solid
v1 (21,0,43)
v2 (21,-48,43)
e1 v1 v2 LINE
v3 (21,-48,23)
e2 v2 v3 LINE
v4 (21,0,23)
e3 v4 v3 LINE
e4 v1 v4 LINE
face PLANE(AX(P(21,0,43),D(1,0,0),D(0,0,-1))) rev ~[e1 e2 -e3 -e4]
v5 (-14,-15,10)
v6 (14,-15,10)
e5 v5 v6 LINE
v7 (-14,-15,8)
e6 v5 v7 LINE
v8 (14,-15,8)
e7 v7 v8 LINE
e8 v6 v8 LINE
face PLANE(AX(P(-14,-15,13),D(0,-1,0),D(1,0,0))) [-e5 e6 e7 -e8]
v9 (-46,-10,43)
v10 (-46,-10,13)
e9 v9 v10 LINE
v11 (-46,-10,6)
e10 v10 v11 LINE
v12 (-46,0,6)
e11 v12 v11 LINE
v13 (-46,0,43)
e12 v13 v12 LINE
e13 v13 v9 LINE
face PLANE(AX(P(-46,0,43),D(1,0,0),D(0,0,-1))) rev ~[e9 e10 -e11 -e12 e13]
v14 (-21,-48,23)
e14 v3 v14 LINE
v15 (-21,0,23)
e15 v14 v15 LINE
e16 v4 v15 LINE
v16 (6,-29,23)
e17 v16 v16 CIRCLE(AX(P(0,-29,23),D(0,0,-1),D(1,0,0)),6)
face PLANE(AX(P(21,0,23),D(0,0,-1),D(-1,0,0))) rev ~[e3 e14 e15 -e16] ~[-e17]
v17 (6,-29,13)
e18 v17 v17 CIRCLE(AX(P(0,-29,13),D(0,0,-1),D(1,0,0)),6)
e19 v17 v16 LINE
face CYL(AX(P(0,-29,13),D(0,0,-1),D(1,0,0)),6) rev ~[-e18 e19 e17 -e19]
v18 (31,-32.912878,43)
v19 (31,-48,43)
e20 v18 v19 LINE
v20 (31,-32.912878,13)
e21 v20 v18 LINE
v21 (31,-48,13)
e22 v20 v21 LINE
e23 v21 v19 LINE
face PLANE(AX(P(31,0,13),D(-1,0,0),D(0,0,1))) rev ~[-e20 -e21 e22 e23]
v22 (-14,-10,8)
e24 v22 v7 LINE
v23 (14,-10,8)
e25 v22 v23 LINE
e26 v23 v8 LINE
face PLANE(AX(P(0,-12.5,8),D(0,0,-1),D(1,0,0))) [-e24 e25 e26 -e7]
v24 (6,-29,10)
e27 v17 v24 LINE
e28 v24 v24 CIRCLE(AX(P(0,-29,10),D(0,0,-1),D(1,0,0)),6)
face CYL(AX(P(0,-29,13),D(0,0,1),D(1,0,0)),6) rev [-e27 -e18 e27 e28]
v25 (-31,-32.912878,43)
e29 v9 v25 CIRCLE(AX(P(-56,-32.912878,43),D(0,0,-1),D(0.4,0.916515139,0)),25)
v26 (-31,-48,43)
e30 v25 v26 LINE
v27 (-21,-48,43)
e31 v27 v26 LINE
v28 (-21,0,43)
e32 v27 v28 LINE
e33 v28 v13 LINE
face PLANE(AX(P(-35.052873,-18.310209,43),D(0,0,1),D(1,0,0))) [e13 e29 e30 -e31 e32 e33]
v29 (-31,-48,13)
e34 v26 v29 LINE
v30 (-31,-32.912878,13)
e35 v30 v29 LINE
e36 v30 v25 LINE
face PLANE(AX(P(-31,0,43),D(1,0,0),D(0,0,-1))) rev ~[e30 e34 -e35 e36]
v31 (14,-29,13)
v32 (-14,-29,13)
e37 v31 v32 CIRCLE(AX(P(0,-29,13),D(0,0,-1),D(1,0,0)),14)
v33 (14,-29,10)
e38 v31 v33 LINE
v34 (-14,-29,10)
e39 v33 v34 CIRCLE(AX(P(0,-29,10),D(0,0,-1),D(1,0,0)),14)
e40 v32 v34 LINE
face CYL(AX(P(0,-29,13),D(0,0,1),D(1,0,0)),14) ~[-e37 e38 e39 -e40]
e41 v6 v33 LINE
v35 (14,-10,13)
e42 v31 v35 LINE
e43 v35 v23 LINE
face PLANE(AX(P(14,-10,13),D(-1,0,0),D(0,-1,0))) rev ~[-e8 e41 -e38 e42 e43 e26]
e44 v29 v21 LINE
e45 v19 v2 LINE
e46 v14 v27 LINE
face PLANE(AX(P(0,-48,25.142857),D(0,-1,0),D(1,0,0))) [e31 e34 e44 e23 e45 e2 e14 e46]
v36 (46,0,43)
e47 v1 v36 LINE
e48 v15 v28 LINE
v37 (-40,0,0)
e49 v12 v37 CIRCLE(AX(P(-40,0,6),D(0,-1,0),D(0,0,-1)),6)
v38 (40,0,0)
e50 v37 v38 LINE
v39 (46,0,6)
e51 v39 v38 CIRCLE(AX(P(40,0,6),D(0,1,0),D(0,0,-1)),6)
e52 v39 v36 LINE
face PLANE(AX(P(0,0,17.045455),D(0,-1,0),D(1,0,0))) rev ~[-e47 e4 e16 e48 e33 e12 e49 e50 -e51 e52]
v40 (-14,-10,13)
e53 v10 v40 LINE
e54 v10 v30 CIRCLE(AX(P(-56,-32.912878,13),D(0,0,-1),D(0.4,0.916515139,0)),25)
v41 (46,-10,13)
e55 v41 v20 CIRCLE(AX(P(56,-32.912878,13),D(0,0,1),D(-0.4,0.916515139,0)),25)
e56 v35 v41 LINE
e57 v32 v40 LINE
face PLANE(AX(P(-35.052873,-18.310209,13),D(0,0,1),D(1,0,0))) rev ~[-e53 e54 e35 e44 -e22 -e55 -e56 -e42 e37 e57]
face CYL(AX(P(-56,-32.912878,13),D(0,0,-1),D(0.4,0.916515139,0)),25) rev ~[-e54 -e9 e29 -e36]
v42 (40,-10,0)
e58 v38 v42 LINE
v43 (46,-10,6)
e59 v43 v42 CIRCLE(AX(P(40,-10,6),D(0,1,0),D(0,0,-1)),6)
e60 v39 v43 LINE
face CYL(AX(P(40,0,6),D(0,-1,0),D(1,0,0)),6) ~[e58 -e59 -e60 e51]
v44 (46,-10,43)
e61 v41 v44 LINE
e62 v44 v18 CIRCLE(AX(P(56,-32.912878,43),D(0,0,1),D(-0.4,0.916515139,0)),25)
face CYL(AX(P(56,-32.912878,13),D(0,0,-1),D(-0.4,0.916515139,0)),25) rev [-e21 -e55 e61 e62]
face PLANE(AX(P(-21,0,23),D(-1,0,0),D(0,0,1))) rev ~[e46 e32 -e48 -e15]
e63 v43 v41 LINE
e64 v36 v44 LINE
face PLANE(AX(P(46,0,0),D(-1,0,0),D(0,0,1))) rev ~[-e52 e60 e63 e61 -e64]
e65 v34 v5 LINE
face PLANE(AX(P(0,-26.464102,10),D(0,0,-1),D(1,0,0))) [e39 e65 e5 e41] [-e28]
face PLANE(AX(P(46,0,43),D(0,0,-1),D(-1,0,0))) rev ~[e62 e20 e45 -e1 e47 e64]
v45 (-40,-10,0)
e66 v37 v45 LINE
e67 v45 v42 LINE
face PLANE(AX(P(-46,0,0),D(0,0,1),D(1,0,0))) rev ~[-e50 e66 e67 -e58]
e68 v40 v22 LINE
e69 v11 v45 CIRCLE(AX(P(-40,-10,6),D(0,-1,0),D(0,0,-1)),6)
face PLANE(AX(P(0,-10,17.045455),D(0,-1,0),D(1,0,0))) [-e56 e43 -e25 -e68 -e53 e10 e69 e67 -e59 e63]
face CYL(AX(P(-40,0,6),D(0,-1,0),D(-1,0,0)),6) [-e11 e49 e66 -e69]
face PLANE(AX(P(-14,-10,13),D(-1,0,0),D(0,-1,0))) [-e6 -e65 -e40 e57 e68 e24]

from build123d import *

# Parameters (mm, degrees)
F1_DEPTH    = 48
F2_DEPTH    = 10
F3_R        = 6
F4_T1_DEPTH = 30
F5_R        = 6
F6_DEPTH    = 3
F5_W        = 28
F5_H        = 5
F7_DEPTH    = 5
F8_DEPTH    = 25


# Not quite as in the source:
# - a fillet or chamfer that OpenCascade refuses, or shapes differently, is made with other operations: its cross-section is extruded or revolved along the edge and cut away or added


with BuildPart() as f1:
    # F0 (on Front) → F1 (new body)
    with BuildSketch(Plane.XZ):
        Polygon((-21, 43), (-31, 43), (-31, 13), (31, 13), (31, 43), (21, 43), (21, 23), (-21, 23), align=None)
    extrude(amount=F1_DEPTH)

    # F0 (on Front) → F2 (join)
    with BuildSketch(Plane.XZ):
        Polygon((-31, 43), (-46, 43), (-46, 0), (46, 0), (46, 43), (31, 43), (31, 13), (-31, 13), align=None)
        Polygon((-21, 43), (-31, 43), (-31, 13), (31, 13), (31, 43), (21, 43), (21, 23), (-21, 23), align=None)
    extrude(amount=F2_DEPTH)

    # F3
    f3_edges = [f1.edges().sort_by_distance(p)[0] for p in [
        (-46, -5, 0),
        (46, -5, 0),
    ]]
    fillet(f3_edges, radius=F3_R)

    # F4: fillet of radius 25 on 2 edges, made by hand

    # F4_s2 → F4_t1 (join)
    with BuildSketch(Plane.XY.offset(13)):
        with BuildLine():
            ThreePointArc((-46, -10), (-35.0834993366, -19.2198145372), (-31, -32.9128784748))
            Line((-31, -32.9128784748), (-31, -10))
            Line((-31, -10), (-46, -10))
        make_face()
        with BuildLine():
            ThreePointArc((46, -10), (35.0834993366, -19.2198145372), (31, -32.9128784748))
            Line((31, -32.9128784748), (31, -10))
            Line((31, -10), (46, -10))
        make_face()
    extrude(amount=F4_T1_DEPTH)

    # F5 (on face) → F6 (join)
    with BuildSketch(Plane(origin=(0, 0, 13), x_dir=(1, 0, 0), z_dir=(0, 0, -1))):
        with BuildLine():
            Line((14, 15), (14, 29))
            ThreePointArc((14, 29), (0, 43), (-14, 29))
            Line((-14, 29), (-14, 15))
            Line((-14, 15), (14, 15))
        make_face()
        with Locations((0, 29)):
            Circle(F5_R, mode=Mode.SUBTRACT)
    extrude(amount=F6_DEPTH)

    # F5 (on face) → F7 (join)
    with BuildSketch(Plane(origin=(0, 0, 13), x_dir=(1, 0, 0), z_dir=(0, 0, -1))):
        with Locations((0, 12.5)):
            Rectangle(F5_W, F5_H)
    extrude(amount=F7_DEPTH)

    # F5 (on face) → F8 (cut)
    with BuildSketch(Plane(origin=(0, 0, 13), x_dir=(1, 0, 0), z_dir=(0, 0, -1))):
        with Locations((0, 29)):
            Circle(F5_R)
    extrude(amount=-F8_DEPTH, mode=Mode.SUBTRACT)


solid = f1.part
